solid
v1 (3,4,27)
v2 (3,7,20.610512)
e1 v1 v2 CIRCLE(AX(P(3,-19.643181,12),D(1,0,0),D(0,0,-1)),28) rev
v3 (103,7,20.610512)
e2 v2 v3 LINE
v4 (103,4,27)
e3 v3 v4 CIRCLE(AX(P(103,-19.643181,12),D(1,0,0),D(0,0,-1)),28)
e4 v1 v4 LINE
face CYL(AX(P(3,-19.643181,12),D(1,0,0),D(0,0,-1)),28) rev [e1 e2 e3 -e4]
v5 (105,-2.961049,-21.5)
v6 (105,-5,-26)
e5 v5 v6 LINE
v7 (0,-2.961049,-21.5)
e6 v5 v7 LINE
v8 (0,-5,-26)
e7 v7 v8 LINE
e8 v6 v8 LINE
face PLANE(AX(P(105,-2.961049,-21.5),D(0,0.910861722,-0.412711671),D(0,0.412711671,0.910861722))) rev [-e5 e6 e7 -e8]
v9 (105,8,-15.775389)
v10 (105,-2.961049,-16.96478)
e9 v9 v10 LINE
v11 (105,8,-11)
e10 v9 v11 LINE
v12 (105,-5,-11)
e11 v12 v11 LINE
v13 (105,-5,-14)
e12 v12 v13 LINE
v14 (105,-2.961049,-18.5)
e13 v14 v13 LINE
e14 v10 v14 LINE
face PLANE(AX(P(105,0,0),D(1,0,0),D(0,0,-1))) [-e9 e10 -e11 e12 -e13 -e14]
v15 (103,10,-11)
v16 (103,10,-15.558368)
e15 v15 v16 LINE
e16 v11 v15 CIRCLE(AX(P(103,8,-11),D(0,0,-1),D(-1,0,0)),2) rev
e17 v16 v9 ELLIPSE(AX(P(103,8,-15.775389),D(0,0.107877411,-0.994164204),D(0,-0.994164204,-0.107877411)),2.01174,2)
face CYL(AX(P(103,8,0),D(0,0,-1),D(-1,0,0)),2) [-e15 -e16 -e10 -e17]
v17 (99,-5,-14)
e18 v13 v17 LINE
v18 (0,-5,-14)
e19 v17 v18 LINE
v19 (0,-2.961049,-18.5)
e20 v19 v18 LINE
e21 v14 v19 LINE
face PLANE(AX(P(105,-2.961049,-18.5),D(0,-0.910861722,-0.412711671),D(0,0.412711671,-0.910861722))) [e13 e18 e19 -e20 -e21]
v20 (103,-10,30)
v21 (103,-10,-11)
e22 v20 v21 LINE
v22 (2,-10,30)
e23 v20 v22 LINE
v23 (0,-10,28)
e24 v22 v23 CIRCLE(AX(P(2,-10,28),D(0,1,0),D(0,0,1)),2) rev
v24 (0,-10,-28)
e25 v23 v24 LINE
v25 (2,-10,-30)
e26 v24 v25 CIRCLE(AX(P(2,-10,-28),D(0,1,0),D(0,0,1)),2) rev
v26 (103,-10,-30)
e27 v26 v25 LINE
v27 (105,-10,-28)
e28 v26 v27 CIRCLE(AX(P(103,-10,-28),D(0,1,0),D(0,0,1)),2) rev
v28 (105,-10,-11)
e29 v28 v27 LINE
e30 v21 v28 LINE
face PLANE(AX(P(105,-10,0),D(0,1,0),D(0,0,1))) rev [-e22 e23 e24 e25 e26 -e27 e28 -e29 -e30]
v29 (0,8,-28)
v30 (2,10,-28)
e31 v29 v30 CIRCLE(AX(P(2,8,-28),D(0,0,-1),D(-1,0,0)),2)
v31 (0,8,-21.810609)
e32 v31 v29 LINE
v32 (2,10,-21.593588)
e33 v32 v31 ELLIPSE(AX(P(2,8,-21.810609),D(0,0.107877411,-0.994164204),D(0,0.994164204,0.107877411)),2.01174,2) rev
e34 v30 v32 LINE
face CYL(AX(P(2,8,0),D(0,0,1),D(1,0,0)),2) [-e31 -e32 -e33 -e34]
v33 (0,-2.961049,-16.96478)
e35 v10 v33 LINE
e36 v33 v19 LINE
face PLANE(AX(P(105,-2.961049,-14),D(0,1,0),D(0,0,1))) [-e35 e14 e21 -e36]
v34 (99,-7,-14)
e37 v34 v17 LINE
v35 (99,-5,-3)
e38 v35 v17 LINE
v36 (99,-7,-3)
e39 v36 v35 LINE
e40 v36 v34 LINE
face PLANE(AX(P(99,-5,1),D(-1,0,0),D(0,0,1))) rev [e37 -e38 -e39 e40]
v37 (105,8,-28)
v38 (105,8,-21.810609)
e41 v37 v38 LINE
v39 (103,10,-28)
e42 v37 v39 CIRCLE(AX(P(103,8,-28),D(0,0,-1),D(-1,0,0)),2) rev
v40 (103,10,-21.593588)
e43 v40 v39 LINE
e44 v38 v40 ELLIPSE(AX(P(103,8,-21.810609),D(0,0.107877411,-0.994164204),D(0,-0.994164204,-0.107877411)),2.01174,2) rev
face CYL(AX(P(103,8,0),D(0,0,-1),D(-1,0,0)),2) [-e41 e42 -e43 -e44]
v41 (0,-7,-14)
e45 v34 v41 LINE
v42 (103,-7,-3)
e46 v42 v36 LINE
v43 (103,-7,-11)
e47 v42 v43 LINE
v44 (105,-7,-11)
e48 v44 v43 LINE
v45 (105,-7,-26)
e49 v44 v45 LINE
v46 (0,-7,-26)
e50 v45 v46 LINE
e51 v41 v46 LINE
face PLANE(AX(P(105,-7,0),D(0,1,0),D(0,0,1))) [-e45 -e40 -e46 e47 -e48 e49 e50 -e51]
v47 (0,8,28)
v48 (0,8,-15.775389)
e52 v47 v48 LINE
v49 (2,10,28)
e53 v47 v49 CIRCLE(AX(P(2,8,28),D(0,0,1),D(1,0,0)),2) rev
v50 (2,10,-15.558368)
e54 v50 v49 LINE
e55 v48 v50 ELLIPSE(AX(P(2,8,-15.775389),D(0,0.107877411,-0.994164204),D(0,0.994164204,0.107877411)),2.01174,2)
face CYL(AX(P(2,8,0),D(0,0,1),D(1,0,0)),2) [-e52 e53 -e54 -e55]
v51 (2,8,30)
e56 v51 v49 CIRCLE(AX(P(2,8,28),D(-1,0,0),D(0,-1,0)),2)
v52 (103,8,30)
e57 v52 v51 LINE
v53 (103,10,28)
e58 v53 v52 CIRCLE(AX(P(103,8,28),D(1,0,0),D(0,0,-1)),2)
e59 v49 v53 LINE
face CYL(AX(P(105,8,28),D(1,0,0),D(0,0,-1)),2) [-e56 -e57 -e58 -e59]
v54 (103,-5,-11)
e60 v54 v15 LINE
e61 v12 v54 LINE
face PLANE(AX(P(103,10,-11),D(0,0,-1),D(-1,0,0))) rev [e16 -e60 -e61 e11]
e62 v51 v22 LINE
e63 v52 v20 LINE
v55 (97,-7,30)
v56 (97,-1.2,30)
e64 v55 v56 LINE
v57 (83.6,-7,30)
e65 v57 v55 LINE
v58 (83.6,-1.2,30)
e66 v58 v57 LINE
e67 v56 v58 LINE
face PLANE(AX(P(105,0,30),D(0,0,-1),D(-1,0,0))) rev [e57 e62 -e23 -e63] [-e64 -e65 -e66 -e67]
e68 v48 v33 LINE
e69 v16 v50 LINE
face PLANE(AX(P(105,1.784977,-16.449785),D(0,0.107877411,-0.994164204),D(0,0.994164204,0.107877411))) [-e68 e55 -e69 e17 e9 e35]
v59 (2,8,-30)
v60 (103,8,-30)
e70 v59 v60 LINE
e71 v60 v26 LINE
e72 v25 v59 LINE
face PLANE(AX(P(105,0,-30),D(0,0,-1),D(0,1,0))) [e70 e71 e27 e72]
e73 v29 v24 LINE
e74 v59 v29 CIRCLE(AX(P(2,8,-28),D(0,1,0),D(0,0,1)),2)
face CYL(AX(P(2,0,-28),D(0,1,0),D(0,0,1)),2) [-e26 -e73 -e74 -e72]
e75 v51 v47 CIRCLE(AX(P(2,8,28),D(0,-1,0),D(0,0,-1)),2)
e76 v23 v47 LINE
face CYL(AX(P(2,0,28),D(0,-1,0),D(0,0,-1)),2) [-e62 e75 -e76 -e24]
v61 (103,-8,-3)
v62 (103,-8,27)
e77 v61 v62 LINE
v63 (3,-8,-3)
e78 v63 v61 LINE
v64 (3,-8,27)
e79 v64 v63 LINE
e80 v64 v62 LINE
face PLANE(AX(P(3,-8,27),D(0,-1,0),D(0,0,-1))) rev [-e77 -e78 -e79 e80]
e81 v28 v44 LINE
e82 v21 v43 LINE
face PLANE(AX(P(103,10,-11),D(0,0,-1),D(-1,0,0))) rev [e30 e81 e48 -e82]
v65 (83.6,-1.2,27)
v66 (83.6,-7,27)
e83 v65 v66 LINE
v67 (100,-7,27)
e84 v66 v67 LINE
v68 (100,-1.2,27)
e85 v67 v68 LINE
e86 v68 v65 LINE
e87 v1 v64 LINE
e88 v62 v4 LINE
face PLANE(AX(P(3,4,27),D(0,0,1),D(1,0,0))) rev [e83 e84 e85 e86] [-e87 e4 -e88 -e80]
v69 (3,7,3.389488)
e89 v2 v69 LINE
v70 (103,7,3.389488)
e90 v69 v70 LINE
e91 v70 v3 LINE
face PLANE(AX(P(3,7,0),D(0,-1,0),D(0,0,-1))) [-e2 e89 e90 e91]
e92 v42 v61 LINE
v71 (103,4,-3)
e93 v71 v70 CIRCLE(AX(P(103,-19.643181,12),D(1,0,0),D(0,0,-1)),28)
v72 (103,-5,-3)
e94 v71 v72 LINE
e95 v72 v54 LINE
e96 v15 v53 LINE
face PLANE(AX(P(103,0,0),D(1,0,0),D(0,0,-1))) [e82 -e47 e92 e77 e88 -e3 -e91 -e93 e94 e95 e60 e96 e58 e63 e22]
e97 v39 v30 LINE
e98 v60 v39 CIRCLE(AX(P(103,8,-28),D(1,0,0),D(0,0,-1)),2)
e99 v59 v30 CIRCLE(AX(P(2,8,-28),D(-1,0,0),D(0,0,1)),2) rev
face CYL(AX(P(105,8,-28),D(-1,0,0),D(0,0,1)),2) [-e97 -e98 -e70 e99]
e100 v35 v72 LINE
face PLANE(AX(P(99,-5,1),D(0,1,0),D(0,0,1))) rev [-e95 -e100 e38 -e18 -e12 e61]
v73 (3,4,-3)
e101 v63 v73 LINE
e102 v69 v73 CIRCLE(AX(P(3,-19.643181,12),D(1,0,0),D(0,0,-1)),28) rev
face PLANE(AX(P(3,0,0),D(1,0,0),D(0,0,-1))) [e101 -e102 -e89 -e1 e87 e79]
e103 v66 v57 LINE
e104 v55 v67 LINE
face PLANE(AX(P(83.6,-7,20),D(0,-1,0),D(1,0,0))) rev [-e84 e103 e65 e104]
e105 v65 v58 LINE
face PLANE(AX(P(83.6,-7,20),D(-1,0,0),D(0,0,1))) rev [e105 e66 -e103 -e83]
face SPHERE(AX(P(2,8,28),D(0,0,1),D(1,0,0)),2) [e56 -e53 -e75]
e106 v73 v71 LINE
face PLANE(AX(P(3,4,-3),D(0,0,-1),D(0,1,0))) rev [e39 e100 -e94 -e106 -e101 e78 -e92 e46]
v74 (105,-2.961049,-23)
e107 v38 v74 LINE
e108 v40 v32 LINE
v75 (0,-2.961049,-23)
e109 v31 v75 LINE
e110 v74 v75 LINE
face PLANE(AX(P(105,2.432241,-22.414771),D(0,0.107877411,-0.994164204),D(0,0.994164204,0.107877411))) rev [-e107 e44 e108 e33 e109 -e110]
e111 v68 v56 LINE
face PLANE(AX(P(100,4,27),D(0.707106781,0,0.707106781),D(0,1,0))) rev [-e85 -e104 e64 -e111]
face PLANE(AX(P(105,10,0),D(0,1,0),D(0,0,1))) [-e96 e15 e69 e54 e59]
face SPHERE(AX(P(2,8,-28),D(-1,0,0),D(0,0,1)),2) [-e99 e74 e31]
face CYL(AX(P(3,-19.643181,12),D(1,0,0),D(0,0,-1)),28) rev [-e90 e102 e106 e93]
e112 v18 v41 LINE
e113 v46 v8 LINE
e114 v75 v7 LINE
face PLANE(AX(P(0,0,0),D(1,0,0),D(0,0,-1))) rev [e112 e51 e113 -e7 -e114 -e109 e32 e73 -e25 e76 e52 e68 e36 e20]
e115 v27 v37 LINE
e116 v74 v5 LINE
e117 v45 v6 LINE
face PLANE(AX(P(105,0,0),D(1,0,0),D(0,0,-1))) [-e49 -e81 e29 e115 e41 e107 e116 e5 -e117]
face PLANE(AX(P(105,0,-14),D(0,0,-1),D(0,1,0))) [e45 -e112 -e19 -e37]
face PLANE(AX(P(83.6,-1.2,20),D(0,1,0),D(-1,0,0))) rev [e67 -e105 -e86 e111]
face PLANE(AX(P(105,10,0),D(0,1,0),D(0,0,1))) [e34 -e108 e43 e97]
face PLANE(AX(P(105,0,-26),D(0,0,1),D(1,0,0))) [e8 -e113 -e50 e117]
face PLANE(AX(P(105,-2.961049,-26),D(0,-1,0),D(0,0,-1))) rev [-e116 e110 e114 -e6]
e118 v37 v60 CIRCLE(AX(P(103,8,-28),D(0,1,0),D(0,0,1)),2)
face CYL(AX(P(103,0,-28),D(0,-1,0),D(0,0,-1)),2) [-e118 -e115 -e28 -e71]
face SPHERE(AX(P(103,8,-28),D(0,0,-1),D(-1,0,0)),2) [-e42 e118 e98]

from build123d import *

# Parameters (mm, degrees)
P_IDAT_VYSUNUT_M2_DEPTH  = 105
SKICA3_W                 = 30
SKICA3_H                 = 12
ODEBRAT_VYSUNUT_M1_DEPTH = 102
SKICA5_W                 = 6
SKICA5_H                 = 2
ODEBRAT_VYSUNUT_M3_DEPTH = 15
ODEBRAT_VYSUNUT_M6_DEPTH = 102
SKICA12_W                = 41
SKICA12_H                = 20
ODEBRAT_VYSUNUT_M8_DEPTH = 2
SKICA13_W                = 13.4
SKICA13_H                = 5.8
ODEBRAT_VYSUNUT_M9_DEPTH = 10
ZAOBLIT1_R               = 2
ZAOBLIT2_R               = 2
ZKOSEN_2_SIZE            = 3


# Some blends are built 0.0001 mm under size
with BuildPart() as part:
    # Skica2 → Přidat vysunutím2 (new body)
    with BuildSketch(Plane(origin=(0, 0, 0), x_dir=(0, 0, -1), z_dir=(1, 0, 0))):
        Polygon((15.558367755, 10), (-30, 10), (-30, -10), (30, -10), (30, 10), (21.59358807, 10), (23, -2.961048892), (21.5, -2.961048892), (26, -5), (26, -7), (14, -7), (14, -5), (18.5, -2.961048892), (16.964779685, -2.961048892), align=None)
    extrude(amount=P_IDAT_VYSUNUT_M2_DEPTH)

    # Skica3 → Odebrat vysunutím1 (cut)
    with BuildSketch(Plane(origin=(105, 0, 0), x_dir=(0, 0, -1), z_dir=(1, 0, 0))):
        with Locations((-12, -2)):
            Rectangle(SKICA3_W, SKICA3_H)
    extrude(amount=-ODEBRAT_VYSUNUT_M1_DEPTH, mode=Mode.SUBTRACT)

    # Skica5 → Odebrat vysunutím3 (cut)
    with BuildSketch(Plane(origin=(0, 0, -14), x_dir=(-1, 0, 0), z_dir=(0, 0, -1))):
        with Locations((-102, -6)):
            Rectangle(SKICA5_W, SKICA5_H)
    extrude(amount=-ODEBRAT_VYSUNUT_M3_DEPTH, mode=Mode.SUBTRACT)

    # Skica10 → Odebrat vysunutím6 (cut)
    with BuildSketch(Plane(origin=(105, 0, 0), x_dir=(0, 0, -1), z_dir=(1, 0, 0))):
        with BuildLine():
            ThreePointArc((-20.610511889, 7), (-23.90017092, 5.702152702), (-27, 4))
            Line((-27, 4), (3, 4))
            ThreePointArc((3, 4), (-0.09982908, 5.702152702), (-3.389488111, 7))
            Line((-3.389488111, 7), (-20.610511889, 7))
        make_face()
    extrude(amount=-ODEBRAT_VYSUNUT_M6_DEPTH, mode=Mode.SUBTRACT)

    # Skica12 → Odebrat vysunutím8 (cut)
    with BuildSketch(Plane(origin=(105, 0, 0), x_dir=(0, 0, -1), z_dir=(1, 0, 0))):
        with Locations((-9.5, 0)):
            Rectangle(SKICA12_W, SKICA12_H)
    extrude(amount=-ODEBRAT_VYSUNUT_M8_DEPTH, mode=Mode.SUBTRACT)

    # Skica13 → Odebrat vysunutím9 (cut)
    with BuildSketch(Plane.XY.offset(30)):
        with Locations((90.3, -4.1)):
            Rectangle(SKICA13_W, SKICA13_H)
    extrude(amount=-ODEBRAT_VYSUNUT_M9_DEPTH, mode=Mode.SUBTRACT)

    # Zaoblit1
    zaoblit1_edges = [part.edges().sort_by_distance(p)[0] for p in [
        (0, 0, 30),
        (0, 10, 7.220816123),
        (105, 10, -13.279183877),
        (105, 10, -25.796794035),
        (0, 10, -25.796794035),
        (0, 0, -30),
        (52.5, 10, -30),
        (105, 0, -30),
    ]]
    fillet(zaoblit1_edges, radius=ZAOBLIT1_R)

    # Zaoblit2
    # the kernel refuses this fillet: 2 mm, written as the material it takes off along each edge
    with BuildSketch(Plane(origin=(2, 8, 28), x_dir=(0, 0, 1), z_dir=(0, 1, 0))) as zaoblit2_piece_1_section:
        Polygon((0, 0), (ZAOBLIT2_R, 0), (ZAOBLIT2_R, -ZAOBLIT2_R), (0, -ZAOBLIT2_R), align=None)
    zaoblit2_piece_1 = extrude(amount=ZAOBLIT2_R, mode=Mode.PRIVATE)
    zaoblit2_piece_1 = zaoblit2_piece_1 - Plane(origin=(2, 8, 28), x_dir=(0.7071067811865475, 0, -0.7071067811865475), z_dir=(0, 1, 0)) * Sphere(ZAOBLIT2_R, mode=Mode.PRIVATE)
    add(zaoblit2_piece_1, mode=Mode.SUBTRACT)
    with BuildSketch(Plane(origin=(2, 10, 30), x_dir=(0, 0, -1), z_dir=(1, 0, 0))) as zaoblit2_piece_2:
        with BuildLine():
            CenterArc((ZAOBLIT2_R, -ZAOBLIT2_R), ZAOBLIT2_R, 90, 90)
            Line((0, -ZAOBLIT2_R), (0, 0))
            Line((0, 0), (ZAOBLIT2_R, 0))
        make_face()
    extrude(amount=106, mode=Mode.SUBTRACT)

    # Zkosení2
    zkosen_2_edges = [part.edges().sort_by_distance(p)[0] for p in [
        (97, -4.1, 27),
    ]]
    chamfer(zkosen_2_edges, length=ZKOSEN_2_SIZE - 0.0001)  # a hair under: the kernel refuses the full size


solid = part.part
